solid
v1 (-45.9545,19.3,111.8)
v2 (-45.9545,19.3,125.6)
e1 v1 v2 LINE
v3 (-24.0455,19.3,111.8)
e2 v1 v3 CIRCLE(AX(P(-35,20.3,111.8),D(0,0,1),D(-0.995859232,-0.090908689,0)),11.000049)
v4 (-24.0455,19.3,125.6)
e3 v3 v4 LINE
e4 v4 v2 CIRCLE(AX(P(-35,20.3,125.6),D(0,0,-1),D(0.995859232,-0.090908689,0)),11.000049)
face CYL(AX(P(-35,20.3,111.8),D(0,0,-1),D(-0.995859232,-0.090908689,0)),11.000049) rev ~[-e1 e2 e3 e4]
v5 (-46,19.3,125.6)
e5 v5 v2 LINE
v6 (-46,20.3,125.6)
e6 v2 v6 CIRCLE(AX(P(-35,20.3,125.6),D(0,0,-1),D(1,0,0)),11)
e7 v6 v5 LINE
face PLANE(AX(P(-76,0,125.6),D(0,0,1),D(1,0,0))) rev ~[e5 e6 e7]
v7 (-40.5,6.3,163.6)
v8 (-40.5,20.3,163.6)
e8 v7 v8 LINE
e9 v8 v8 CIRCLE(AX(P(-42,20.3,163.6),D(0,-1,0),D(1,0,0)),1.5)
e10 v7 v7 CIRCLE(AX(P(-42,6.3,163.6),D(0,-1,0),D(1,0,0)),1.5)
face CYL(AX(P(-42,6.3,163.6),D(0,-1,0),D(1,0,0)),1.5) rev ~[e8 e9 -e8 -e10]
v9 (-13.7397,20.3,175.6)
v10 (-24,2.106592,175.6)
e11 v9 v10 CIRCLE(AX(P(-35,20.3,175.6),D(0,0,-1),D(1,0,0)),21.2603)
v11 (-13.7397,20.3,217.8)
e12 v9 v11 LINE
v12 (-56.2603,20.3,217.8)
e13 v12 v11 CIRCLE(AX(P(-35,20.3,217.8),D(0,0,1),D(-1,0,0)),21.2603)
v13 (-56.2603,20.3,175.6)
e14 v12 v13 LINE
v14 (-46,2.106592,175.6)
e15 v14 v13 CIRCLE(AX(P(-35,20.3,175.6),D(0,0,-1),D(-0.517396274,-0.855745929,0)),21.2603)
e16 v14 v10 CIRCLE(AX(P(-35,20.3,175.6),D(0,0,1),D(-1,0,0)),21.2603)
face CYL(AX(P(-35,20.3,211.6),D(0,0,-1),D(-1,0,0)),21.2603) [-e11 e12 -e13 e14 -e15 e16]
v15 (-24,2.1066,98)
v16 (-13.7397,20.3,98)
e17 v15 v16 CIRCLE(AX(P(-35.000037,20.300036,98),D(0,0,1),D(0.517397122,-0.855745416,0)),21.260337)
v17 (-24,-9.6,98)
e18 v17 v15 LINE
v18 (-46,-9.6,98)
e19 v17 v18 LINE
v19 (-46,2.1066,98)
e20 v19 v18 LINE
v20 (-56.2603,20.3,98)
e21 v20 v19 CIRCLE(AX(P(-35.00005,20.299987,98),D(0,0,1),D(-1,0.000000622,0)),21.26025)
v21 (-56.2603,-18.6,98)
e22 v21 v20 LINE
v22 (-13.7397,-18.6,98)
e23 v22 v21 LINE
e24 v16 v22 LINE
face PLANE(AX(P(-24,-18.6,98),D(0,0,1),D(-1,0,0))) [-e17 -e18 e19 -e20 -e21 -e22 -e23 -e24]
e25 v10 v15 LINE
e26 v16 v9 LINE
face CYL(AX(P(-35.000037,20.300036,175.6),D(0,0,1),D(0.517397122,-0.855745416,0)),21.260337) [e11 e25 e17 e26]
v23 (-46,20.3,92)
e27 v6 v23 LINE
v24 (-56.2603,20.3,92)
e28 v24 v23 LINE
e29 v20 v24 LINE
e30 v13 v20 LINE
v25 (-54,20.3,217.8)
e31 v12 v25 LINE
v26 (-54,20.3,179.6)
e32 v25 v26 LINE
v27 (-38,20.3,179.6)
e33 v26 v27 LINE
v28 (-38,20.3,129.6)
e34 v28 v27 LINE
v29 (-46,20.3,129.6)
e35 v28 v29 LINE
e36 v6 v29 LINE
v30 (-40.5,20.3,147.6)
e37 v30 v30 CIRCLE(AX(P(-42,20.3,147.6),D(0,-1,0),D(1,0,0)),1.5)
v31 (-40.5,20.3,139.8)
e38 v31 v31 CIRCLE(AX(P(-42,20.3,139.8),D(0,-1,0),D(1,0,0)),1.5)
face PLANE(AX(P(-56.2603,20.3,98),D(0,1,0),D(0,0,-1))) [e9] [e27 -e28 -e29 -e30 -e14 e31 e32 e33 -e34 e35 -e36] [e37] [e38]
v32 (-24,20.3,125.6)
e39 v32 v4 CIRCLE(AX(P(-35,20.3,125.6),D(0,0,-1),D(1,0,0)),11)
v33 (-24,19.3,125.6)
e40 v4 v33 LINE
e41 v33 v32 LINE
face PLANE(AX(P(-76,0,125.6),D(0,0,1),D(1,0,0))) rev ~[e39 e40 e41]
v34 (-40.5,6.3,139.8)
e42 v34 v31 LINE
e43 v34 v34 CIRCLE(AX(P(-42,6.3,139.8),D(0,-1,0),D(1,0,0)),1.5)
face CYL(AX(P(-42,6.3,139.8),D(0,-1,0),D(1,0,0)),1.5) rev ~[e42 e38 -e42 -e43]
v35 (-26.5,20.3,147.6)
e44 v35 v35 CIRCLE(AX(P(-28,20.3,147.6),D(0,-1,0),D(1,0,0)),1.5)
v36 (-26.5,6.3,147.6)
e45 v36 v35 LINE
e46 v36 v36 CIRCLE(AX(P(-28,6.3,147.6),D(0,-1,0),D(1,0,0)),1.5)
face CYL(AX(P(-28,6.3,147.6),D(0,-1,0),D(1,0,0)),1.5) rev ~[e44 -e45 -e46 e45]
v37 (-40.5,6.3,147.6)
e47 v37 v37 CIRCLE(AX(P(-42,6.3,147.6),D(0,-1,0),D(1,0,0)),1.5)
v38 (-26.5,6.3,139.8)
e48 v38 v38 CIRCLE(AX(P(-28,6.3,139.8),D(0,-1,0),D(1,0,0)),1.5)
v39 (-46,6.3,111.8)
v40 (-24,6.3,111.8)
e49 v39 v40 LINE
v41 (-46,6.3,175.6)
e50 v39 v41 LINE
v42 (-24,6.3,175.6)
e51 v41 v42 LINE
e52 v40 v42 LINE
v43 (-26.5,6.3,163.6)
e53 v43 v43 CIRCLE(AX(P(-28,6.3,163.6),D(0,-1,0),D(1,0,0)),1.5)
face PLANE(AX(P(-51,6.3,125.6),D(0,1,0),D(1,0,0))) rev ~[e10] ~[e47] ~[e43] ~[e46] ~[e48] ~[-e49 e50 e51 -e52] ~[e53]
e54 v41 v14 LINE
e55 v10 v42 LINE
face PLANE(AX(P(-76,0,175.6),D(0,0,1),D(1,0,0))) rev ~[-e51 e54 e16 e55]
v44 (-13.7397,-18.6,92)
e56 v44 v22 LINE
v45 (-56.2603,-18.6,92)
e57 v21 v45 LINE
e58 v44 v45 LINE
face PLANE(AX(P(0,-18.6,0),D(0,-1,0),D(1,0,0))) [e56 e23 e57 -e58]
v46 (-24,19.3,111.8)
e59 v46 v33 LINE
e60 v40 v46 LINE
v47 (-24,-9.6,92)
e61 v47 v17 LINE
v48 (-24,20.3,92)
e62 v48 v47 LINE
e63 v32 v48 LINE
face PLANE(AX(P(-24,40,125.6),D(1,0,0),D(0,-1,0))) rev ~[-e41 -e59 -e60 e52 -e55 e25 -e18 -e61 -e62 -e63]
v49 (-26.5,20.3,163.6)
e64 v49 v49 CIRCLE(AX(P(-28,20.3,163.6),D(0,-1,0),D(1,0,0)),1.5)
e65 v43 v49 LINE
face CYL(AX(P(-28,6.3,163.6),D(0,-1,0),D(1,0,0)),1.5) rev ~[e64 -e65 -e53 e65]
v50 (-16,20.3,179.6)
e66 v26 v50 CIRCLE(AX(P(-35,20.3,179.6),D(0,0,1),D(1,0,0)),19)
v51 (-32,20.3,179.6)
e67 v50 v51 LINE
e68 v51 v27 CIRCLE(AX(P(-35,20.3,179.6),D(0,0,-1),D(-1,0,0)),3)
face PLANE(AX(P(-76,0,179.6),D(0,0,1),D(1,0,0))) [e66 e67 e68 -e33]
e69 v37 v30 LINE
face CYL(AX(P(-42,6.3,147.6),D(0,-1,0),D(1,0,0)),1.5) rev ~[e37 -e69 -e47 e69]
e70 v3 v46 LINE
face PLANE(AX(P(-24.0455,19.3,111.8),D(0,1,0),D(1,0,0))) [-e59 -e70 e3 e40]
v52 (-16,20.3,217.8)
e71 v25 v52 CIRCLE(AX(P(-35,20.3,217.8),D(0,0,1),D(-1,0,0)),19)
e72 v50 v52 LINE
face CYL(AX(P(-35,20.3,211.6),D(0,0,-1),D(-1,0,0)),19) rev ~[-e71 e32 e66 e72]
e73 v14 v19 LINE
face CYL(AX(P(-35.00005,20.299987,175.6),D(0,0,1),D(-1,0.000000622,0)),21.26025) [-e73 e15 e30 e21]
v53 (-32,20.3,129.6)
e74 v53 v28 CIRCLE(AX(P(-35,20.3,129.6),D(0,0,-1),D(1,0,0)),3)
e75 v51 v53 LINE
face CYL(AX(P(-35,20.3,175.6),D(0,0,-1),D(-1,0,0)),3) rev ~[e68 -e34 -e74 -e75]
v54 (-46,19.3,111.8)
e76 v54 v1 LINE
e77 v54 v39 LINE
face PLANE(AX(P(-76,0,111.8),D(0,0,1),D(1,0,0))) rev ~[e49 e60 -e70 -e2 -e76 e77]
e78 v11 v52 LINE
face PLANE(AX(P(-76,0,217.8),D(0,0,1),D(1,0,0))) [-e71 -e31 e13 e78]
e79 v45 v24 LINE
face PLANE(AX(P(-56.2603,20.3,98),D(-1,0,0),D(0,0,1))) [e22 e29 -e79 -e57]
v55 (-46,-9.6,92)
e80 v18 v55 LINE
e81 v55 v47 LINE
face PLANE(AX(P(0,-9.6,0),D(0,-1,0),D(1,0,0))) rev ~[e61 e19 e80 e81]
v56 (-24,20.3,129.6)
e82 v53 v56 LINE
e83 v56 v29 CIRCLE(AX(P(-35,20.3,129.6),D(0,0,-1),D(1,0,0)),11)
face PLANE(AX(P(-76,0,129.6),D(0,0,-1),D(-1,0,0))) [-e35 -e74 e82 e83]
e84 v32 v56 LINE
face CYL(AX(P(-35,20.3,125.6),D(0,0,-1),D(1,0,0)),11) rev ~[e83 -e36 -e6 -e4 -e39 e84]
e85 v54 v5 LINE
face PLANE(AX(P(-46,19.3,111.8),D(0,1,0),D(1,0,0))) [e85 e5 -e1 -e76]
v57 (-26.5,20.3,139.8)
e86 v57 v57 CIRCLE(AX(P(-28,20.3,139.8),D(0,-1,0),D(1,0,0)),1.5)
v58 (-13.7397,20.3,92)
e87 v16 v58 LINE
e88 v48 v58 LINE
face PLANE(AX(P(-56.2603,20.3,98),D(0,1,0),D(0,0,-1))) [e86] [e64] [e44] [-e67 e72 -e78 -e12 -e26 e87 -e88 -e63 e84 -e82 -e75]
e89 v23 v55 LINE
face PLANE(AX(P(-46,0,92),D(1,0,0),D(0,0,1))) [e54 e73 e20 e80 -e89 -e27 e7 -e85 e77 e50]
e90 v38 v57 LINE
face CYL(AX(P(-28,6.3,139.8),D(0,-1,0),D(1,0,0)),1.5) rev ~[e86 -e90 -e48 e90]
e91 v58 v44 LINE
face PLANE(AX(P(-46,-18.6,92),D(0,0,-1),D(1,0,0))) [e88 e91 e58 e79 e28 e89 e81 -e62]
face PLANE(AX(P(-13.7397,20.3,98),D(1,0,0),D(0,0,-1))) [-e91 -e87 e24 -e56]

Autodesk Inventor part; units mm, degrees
ref_plane "YZ Plane" through (0, 0, 0) normal (1, 0, 0) x (0, 1, 0)
ref_plane "XZ Plane" through (0, 0, 0) normal (0, 1, 0) x (-1, 0, 0)
ref_plane "XY Plane" through (0, 0, 0) normal (0, 0, 1) x (1, 0, 0)
sketch "Sketch1" plane through (0, 0, 0) normal (0, 1, 0) x (-1, 0, 0)
  line L0 (0, 0) -> (0, 62)
  line L1 (0, 62) -> (70, 62)
  line L2 (70, 62) -> (70, 0)
  line L3 (76, 0) -> (76, 68)
  line L4 (76, 68) -> (-6, 68)
  line L5 (-6, 68) -> (-6, 0)
  line L6 (70, 0) -> (76, 0)
  line L7 (-6, 0) -> (0, 0)
  dimension "d0" = 62
  dimension "d1" = 70
  dimension "d2" = 6
  dimension "d5" = 62
extrude "Extrusion1" add sketch "Sketch1" along normal blind 40
sketch "Sketch2" plane through (6, 0, 68) normal (1, 0, 0) x (0, 0, -1)
  line L0 (68, 0) -> (68, 40) projected
  circle A0 centre (56, 25) radius 1.5
  circle A1 centre (51, 20) radius 1.5
  circle A2 centre (56, 15) radius 1.5
  circle A3 centre (61, 20) radius 1.5
  point P0 (56, 20)
  dimension "d9" = 3
  dimension "d12" = 360
extrude "Extrusion2" cut sketch "Sketch2" against normal up to surface (6 mm away)
sketch "Sketch3" plane through (-70, 0, 62) normal (1, 0, 0) x (0, 0, -1)
  line L0 (62, 0) -> (62, 40) projected
  line L1 (62, 20) -> (58, 20)
  circle A0 centre (50, 20) radius 5.75
  dimension "d16" = 4
  dimension "d18" = 11.5
extrude "Extrusion3" add sketch "Sketch3" along normal blind 5
fillet "Fillet1" radius 8 4 edges at (3, 40, 0) (3, 0, 0) (-73, 0, 0) (-73, 40, 0)
sketch "Sketch4" plane through (-76, 0, 68) normal (0, 0, 1) x (1, 0, 0)
  line L0 (41, 0) -> (41, 20)
  line L1 (30, 0) -> (30, 40)
  line L2 (76, 40) -> (6, 40) projected
  line L3 (52, 0) -> (52, 40)
  line L4 (25, 0) -> (25, 40)
  line L5 (57, 0) -> (57, 40)
  line L6 (25, 40) -> (30, 40)
  line L7 (52, 40) -> (57, 40)
  line L8 (52, 0) -> (57, 0)
  line L9 (76, 0) -> (6, 0) projected
  line L10 (30, 0) -> (25, 0)
  dimension "d22" = 11
  dimension "d23" = 11
  dimension "d24" = 5
  dimension "d25" = 5
extrude "Extrusion4" add sketch "Sketch4" along normal blind 24 contours L9 L4 L2 L1 | L2 L5 L8 L3
sketch "Sketch5" plane through (-76, 0, 92) normal (0, 0, 1) x (1, 0, 0)
  line L0 (25, 0) -> (25, 40) projected
  line L1 (57, 0) -> (57, 40) projected
  line L2 (25, 0) -> (57, 0)
  line L3 (57, 0) -> (57, 40)
  line L4 (52, 0) -> (52, 40) projected
  line L5 (57, 40) -> (52, 40)
  line L6 (30, 0) -> (52, 0) projected
  line L7 (41, 3.3) -> (41, 9.3)
  line L8 (41, 9.3) -> (52, 9.3)
  line L9 (41, 9.3) -> (30, 9.3)
  line L10 (52, 9.3) -> (52, 40)
  line L11 (76, 40) -> (6, 40) projected
  line L12 (30, 40) -> (30, 0) projected
  line L13 (30, 9.3) -> (30, 40)
  line L14 (30, 40) -> (25, 40)
  line L15 (25, 40) -> (25, 0)
  line L16 (76, 0) -> (6, 0) projected
  dimension "d29" = 6
extrude "Extrusion5" add sketch "Sketch5" along normal blind 6 contours L0 L11 L12 L2 | L12 L9 L8 L4 L2 | L4 L5 L1 L2
sketch "Sketch6" plane through (-76, 0, 98) normal (0, 0, 1) x (1, 0, 0)
  line L0 (25, 0) -> (25, 40) projected
  line L1 (25, 40) -> (25, 0)
  line L2 (57, 40) -> (57, 0) projected
  line L3 (25, 0) -> (57, 0)
  line L4 (57, 0) -> (57, 40)
  line L5 (52, 0) -> (52, 40) projected
  line L6 (57, 40) -> (52, 40)
  line L7 (30, 40) -> (25, 40) projected
  line L8 (25, 40) -> (30, 40)
  line L9 (30, 0) -> (52, 0) projected
  line L10 (30, 40) -> (30, 0)
  line L11 (30, 0) -> (52, 0)
  line L12 (52, 40) -> (52, 9.3) projected
  line L13 (52, 40) -> (52, 0)
  line L14 (25, 0) -> (57, 0) projected
  point P0 (76, 0)
extrude "Extrusion6" add sketch "Sketch6" along normal blind 13.8
sketch "Sketch8" plane through (-76, 0, 111.8) normal (0, 0, 1) x (1, 0, 0)
  line L0 (52, 9.3) -> (30, 9.3) projected
  arc A0 (30.0455, 19.3) -> (51.9545, 19.3) centre (41, 20.3) ccw
  line L1 (51.9545, 19.3) -> (52, 19.3)
  line L2 (52, 0) -> (52, 40) projected
  line L3 (30, 40) -> (52, 40) projected
  line L4 (52, 19.3) -> (52, 40)
  line L5 (57, 40) -> (52, 40) projected
  line L6 (52, 40) -> (57, 40)
  line L7 (57, 40) -> (57, 6.3)
  line L8 (57, 40) -> (57, 0) projected
  line L9 (57, 6.3) -> (25, 6.3)
  line L10 (25, 0) -> (25, 40) projected
  line L11 (0, 40) -> (25, 40) projected
  line L12 (25, 6.3) -> (25, 40)
  line L13 (25, 40) -> (30, 40)
  line L14 (30, 40) -> (30, 19.3)
  line L15 (30, 40) -> (30, 0) projected
  line L16 (30, 19.3) -> (30.0455, 19.3)
  point P0 (76, 0)
  dimension "d37" = 33.7
  dimension "d38" = 11
extrude "Extrusion7" add sketch "Sketch8" along normal blind 13.8 contours L2 L9 L15 L0 | L0 A0 L1 L2 | L2 L5 L7 L9 | L0 L15 L16 A0 | L15 L9 L10 L13 L14
sketch "Sketch9" plane through (-76, 0, 125.6) normal (0, 0, 1) x (1, 0, 0)
  line L0 (25, 6.3) -> (57, 6.3) projected
  arc A0 (30.0455, 19.3) -> (51.9545, 19.3) centre (41, 20.3) ccw projected
  arc A1 (38, 20.3) -> (44, 20.3) centre (41, 20.3) ccw
  line L1 (25, 40) -> (25, 6.3) projected
  line L2 (25, 6.3) -> (25, 40)
  line L3 (57, 6.3) -> (57, 40) projected
  line L4 (25, 40) -> (57, 40)
  line L5 (38, 20.3) -> (30, 20.3)
  line L6 (30, 19.3) -> (30, 40) projected
  line L7 (44, 20.3) -> (52, 20.3)
  line L8 (52, 40) -> (52, 20.3)
  line L9 (52, 40) -> (57, 40)
  line L10 (57, 40) -> (57, 6.3)
  line L11 (57, 6.3) -> (25, 6.3)
  point P0 (76, 0)
  dimension "d41" = 6
extrude "Extrusion8" add sketch "Sketch9" along normal blind 50 contours L1 L4 L6 L5 A1 L7 L8 L3 L0
sketch "Sketch10" plane through (0, 40, 0) normal (0, 1, 0) x (1, 0, 0)
  line L0 (-24, -98) -> (-46, -98) projected
  line L1 (-46, -98) -> (-24, -98)
  line L2 (-24, -175.6) -> (-46, -175.6)
  line L3 (-19, -68) -> (-19, -175.6) projected
  line L4 (-19, -175.6) -> (-24, -175.6)
  line L5 (-24, -175.6) -> (-24, -98)
  line L6 (-24, -98) -> (-19, -98)
  line L7 (-19, -98) -> (-19, -175.6)
  line L8 (-51, -175.6) -> (-19, -175.6) projected
  line L9 (-51, -175.6) -> (-46, -175.6)
  line L10 (-46, -98) -> (-51, -98)
  line L11 (-51, -98) -> (-51, -175.6)
  point P0 (0, 0)
extrude "Extrusion9" cut sketch "Sketch10" against normal up to surface (19.7 mm away)
sketch "Sketch11" plane through (-76, 0, 175.6) normal (0, 0, 1) x (1, 0, 0)
  arc A0 (38, 20.3) -> (44, 20.3) centre (41, 20.3) ccw projected
  line L0 (52, 20.3) -> (44, 20.3) projected
  arc A1 (19.7397, 20.3) -> (62.2603, 20.3) centre (41, 20.3) ccw
  arc A2 (38, 20.3) -> (44, 20.3) centre (41, 20.3) ccw
  line L1 (19.7397, 20.3) -> (38, 20.3)
  line L2 (44, 20.3) -> (62.2603, 20.3)
  point P0 (76, 0)
extrude "Extrusion10" add sketch "Sketch11" along normal blind 36
sketch "Sketch12" plane through (-76, 0, 211.6) normal (0, 0, 1) x (1, 0, 0)
  arc A0 (38, 20.3) -> (44, 20.3) centre (41, 20.3) ccw projected
  circle A1 centre (41, 20.3) radius 19
  point P0 (76, 0)
  dimension "d49" = 38
extrude "Extrusion11" cut sketch "Sketch12" against normal blind 32
sketch "Sketch13" plane through (-76, 0, 211.6) normal (0, 0, 1) x (1, 0, 0)
  line L0 (62.2603, 20.3) -> (57, 20.3) projected
  arc A0 (19.7397, 20.3) -> (62.2603, 20.3) centre (41, 20.3) ccw
  line L1 (22, 20.3) -> (38, 20.3) projected
  arc A1 (22, 20.3) -> (60, 20.3) centre (41, 20.3) ccw projected
  arc A2 (22, 20.3) -> (60, 20.3) centre (41, 20.3) ccw
  line L2 (19.7397, 20.3) -> (22, 20.3)
  line L3 (62.2603, 20.3) -> (60, 20.3)
  point P0 (76, 0)
extrude "Extrusion12" add sketch "Sketch13" along normal blind 6.2
fillet "Fillet3" radius 1 5 edges at (-76, 20, 68) (-35, 40, 68) (-6.5, 40, 68) (-63.5, 40, 68) (6, 20, 68)
sketch "Sketch20" plane through (-19, 0, 111.8) normal (1, 0, 0) x (0, 0, -1)
  line L0 (0, 6.3) -> (-63.8, 6.3) projected
  line L1 (0, 6.3) -> (0, 0) projected
  line L2 (-63.8, 6.3) -> (0, 6.3)
  line L3 (0, 6.3) -> (0, 0)
  line L4 (0, 0) -> (-63.8, 0)
  line L5 (-63.8, 0) -> (-63.8, 6.3)
  point P0 (111.8, 0)
extrude "Extrusion19" add sketch "Sketch20" against normal up to surface (5 mm away)
sketch "Sketch21" plane through (-51, 0, 68) normal (-1, 0, 0) x (0, 0, 1)
  line L0 (43.8, 6.3) -> (107.6, 6.3) projected
  line L1 (0, 0) -> (107.6, 0) projected
  line L2 (43.8, 6.3) -> (107.6, 6.3)
  line L3 (107.6, 6.3) -> (107.6, 0)
  line L4 (107.6, 0) -> (43.8, 0)
  line L5 (43.8, 0) -> (43.8, 6.3)
  point P0 (-68, 0)
  point P1 (107.6, 6.3)
  point P2 (43.8, 0)
extrude "Extrusion20" add sketch "Sketch21" against normal up to surface (5 mm away)
sketch "Sketch22" plane through (-51, 20.3, 98) normal (-1, 0, 0) x (0, 0, 1)
  line L0 (-31, 19.7) -> (0, 19.7) projected
  line L1 (-31, 19.7) -> (0, 19.7)
  line L2 (0, 0) -> (27.6, 0) projected
  line L3 (0, 19.7) -> (0, 0)
  line L4 (77.6, 0) -> (119.8, 0) projected
  line L5 (0, 0) -> (77.6, 0)
  line L6 (-30, -20.3) -> (77.6, -20.3) projected
  line L7 (77.6, 0) -> (77.6, -20.3)
  line L8 (-31, 19.7) -> (-31, -20.3) projected
  line L9 (77.6, -20.3) -> (-31, -20.3)
  line L10 (-31, -20.3) -> (-31, 19.7)
  point P0 (-98, -20.3)
extrude "Extrusion21" add sketch "Sketch22" along normal up to surface (5.2603 mm away)
sketch "Sketch23" plane through (-19, 20.3, 98) normal (1, 0, 0) x (0, 0, -1)
  line L0 (31, 19.7) -> (0, 19.7) projected
  line L1 (0, 19.7) -> (0, 0) projected
  line L2 (0, 19.7) -> (0, 0)
  line L3 (0, 0) -> (-77.6, 0) projected
  line L4 (0, 0) -> (-77.6, 0)
  line L5 (-77.6, -20.3) -> (-77.6, -18.1934) projected
  line L6 (-77.6, 0) -> (-77.6, -20.3)
  line L7 (31, 19.7) -> (31, -20.3) projected
  line L8 (-77.6, -20.3) -> (31, -20.3)
  line L9 (31, -20.3) -> (31, 19.7)
  line L10 (31, 19.7) -> (0, 19.7)
  point P0 (98, -20.3)
extrude "Extrusion22" add sketch "Sketch23" along normal up to surface (5.2603 mm away)
sketch "Sketch24" plane through (-24, 0, 175.6) normal (0, 0, 1) x (1, 0, 0)
  line L0 (0, 2.1066) -> (0, 0) projected
  line L1 (0, 20.3) -> (10.2603, 20.3) projected
  arc A0 (0, 2.1066) -> (10.2603, 20.3) centre (-11, 20.3) ccw
  line L2 (-32.2603, 20.3) -> (-32.2603, 0) projected
  line L3 (-22, 0) -> (-22, 2.1066) projected
  arc A1 (-32.2603, 20.3) -> (-22, 2.1066) centre (-11, 20.3) ccw
  line L4 (-32.2603, 20.3) -> (-32.2603, 0)
  line L5 (24, 0) -> (-46, 0) projected
  line L6 (-22, 0) -> (-32.2603, 0)
  line L7 (-22, 0) -> (-22, 2.1066)
  line L8 (0, 0) -> (0, 2.1066)
  line L9 (10.2603, 39) -> (10.2603, 0) projected
  line L10 (10.2603, 0) -> (0, 0)
  arc A2 (0, 2.1066) -> (10.2603, 20.3) centre (-11, 20.3) ccw projected
  line L11 (10.2603, 0) -> (10.2603, 20.3)
extrude "Extrusion23" cut sketch "Sketch24" against normal up to surface (77.6 mm away)
sketch "Sketch25" plane through (-56.2603, 0, 68) normal (-1, 0, 0) x (0, 0, 1)
  line L0 (24, 9.3) -> (24, 0) projected
  line L1 (24, 0) -> (24, 40)
  line L2 (-1, 40) -> (30, 40) projected
  line L3 (24, 40) -> (-68, 40)
  line L4 (-68, 8) -> (-68, 32) projected
  line L5 (-68, 40) -> (-68, 0)
  line L6 (-68, 0) -> (24, 0)
extrude "Extrusion24" cut sketch "Sketch25" along normal mid plane 150
sketch "Sketch26" plane through (-56.2603, 0, 92) normal (-1, 0, 0) x (0, 0, 1)
  line L0 (6, 40) -> (0, 40) projected
  line L1 (6, 20.3) -> (6, 40) projected
  line L2 (0, 40) -> (6, 40)
  line L3 (6, 40) -> (6, 20.3)
  line L4 (6, 20.3) -> (0, 20.3)
  line L5 (0, 20.3) -> (0, 40)
  point P0 (-92, 0)
extrude "Extrusion25" cut sketch "Sketch26" against normal up to surface (42.5206 mm away)
sketch "Sketch28" plane through (-46, 6.3, 111.8) normal (0, -1, 0) x (1, 0, 0)
  line L0 (22, 63.8) -> (0, 63.8) projected
  line L1 (0, 63.8) -> (8, 63.8)
  line L2 (8, 13.8) -> (8, 67.8) projected
  line L3 (0.0455, 0) -> (21.9545, 0) projected
  circle A0 centre (18, 28) radius 1.5
  circle A1 centre (18, 35.8) radius 1.5
  circle A2 centre (18, 51.8) radius 1.5
  circle A3 centre (4, 28) radius 1.5
  circle A4 centre (4, 35.8) radius 1.5
  circle A5 centre (4, 51.8) radius 1.5
  point P0 (46, -111.8)
extrude "Extrusion27" cut sketch "Sketch28" against normal through all
sketch "Sketch29" plane through (0, 0, 0) normal (0, -1, 0) x (1, 0, 0)
  line L0 (-24, 98) -> (-46, 98) projected
  line L1 (-24, 125.6) -> (-24, 92) projected
  line L2 (-46, 98) -> (-24, 98)
  line L3 (-24, 98) -> (-24, 92)
  line L4 (-24, 92) -> (-46, 92)
  line L5 (-46, 92) -> (-46, 98)
  point P0 (0, 0)
extrude "Extrusion28" cut sketch "Sketch29" against normal up to surface (9.3 mm away)
sketch "Sketch30" plane through (0, 0, 0) normal (0, -1, 0) x (1, 0, 0)
  line L0 (-13.7397, 98) -> (-13.7397, 217.8) projected
  line L1 (-24, 92) -> (-13.7397, 92) projected
  line L2 (-13.7397, 98) -> (-24, 98)
  line L3 (-24, 98) -> (-24, 92)
  line L4 (-24, 92) -> (-13.7397, 92)
  line L5 (-13.7397, 92) -> (-13.7397, 98)
  line L6 (-46, 175.6) -> (-46, 98) projected
  line L7 (-56.2603, 92) -> (-46, 92) projected
  line L8 (-46, 98) -> (-56.2603, 98)
  line L9 (-56.2603, 98) -> (-56.2603, 92)
  line L10 (-56.2603, 92) -> (-46, 92)
  line L11 (-46, 92) -> (-46, 98)
  point P0 (0, 0)
extrude "Extrusion29" add sketch "Sketch30" along normal blind 18.6
sketch "Sketch31" plane through (0, -18.6, 0) normal (0, -1, 0) x (1, 0, 0)
  line L0 (-13.7397, 98) -> (-24, 98) projected
  line L1 (-56.2603, 92) -> (-46, 92) projected
  line L2 (-24, 98) -> (-46, 98)
  line L3 (-46, 98) -> (-46, 92)
  line L4 (-46, 92) -> (-24, 92)
  line L5 (-24, 92) -> (-24, 98)
  point P0 (0, 0)
extrude "Extrusion30" add sketch "Sketch31" against normal blind 9
sketch "Sketch32" plane through (-76, 0, 125.6) normal (0, 0, -1) x (-1, 0, 0)
  line L0 (-44, 20.3) -> (-60, 20.3) projected
  line L1 (-52, 20.3) -> (-44, 20.3)
  arc A0 (-44, 20.3) -> (-38, 20.3) centre (-41, 20.3) ccw projected
  line L2 (-38, 20.3) -> (-30, 20.3)
  line L3 (-22, 20.3) -> (-38, 20.3) projected
  arc A1 (-52, 20.3) -> (-30, 20.3) centre (-41, 20.3) ccw
  arc A2 (-44, 20.3) -> (-38, 20.3) centre (-41, 20.3) ccw
  point P0 (-76, 0)
extrude "Extrusion31" cut sketch "Sketch32" against normal blind 4
properties part number "Tilt_Bracket_Output_2_Lid"
